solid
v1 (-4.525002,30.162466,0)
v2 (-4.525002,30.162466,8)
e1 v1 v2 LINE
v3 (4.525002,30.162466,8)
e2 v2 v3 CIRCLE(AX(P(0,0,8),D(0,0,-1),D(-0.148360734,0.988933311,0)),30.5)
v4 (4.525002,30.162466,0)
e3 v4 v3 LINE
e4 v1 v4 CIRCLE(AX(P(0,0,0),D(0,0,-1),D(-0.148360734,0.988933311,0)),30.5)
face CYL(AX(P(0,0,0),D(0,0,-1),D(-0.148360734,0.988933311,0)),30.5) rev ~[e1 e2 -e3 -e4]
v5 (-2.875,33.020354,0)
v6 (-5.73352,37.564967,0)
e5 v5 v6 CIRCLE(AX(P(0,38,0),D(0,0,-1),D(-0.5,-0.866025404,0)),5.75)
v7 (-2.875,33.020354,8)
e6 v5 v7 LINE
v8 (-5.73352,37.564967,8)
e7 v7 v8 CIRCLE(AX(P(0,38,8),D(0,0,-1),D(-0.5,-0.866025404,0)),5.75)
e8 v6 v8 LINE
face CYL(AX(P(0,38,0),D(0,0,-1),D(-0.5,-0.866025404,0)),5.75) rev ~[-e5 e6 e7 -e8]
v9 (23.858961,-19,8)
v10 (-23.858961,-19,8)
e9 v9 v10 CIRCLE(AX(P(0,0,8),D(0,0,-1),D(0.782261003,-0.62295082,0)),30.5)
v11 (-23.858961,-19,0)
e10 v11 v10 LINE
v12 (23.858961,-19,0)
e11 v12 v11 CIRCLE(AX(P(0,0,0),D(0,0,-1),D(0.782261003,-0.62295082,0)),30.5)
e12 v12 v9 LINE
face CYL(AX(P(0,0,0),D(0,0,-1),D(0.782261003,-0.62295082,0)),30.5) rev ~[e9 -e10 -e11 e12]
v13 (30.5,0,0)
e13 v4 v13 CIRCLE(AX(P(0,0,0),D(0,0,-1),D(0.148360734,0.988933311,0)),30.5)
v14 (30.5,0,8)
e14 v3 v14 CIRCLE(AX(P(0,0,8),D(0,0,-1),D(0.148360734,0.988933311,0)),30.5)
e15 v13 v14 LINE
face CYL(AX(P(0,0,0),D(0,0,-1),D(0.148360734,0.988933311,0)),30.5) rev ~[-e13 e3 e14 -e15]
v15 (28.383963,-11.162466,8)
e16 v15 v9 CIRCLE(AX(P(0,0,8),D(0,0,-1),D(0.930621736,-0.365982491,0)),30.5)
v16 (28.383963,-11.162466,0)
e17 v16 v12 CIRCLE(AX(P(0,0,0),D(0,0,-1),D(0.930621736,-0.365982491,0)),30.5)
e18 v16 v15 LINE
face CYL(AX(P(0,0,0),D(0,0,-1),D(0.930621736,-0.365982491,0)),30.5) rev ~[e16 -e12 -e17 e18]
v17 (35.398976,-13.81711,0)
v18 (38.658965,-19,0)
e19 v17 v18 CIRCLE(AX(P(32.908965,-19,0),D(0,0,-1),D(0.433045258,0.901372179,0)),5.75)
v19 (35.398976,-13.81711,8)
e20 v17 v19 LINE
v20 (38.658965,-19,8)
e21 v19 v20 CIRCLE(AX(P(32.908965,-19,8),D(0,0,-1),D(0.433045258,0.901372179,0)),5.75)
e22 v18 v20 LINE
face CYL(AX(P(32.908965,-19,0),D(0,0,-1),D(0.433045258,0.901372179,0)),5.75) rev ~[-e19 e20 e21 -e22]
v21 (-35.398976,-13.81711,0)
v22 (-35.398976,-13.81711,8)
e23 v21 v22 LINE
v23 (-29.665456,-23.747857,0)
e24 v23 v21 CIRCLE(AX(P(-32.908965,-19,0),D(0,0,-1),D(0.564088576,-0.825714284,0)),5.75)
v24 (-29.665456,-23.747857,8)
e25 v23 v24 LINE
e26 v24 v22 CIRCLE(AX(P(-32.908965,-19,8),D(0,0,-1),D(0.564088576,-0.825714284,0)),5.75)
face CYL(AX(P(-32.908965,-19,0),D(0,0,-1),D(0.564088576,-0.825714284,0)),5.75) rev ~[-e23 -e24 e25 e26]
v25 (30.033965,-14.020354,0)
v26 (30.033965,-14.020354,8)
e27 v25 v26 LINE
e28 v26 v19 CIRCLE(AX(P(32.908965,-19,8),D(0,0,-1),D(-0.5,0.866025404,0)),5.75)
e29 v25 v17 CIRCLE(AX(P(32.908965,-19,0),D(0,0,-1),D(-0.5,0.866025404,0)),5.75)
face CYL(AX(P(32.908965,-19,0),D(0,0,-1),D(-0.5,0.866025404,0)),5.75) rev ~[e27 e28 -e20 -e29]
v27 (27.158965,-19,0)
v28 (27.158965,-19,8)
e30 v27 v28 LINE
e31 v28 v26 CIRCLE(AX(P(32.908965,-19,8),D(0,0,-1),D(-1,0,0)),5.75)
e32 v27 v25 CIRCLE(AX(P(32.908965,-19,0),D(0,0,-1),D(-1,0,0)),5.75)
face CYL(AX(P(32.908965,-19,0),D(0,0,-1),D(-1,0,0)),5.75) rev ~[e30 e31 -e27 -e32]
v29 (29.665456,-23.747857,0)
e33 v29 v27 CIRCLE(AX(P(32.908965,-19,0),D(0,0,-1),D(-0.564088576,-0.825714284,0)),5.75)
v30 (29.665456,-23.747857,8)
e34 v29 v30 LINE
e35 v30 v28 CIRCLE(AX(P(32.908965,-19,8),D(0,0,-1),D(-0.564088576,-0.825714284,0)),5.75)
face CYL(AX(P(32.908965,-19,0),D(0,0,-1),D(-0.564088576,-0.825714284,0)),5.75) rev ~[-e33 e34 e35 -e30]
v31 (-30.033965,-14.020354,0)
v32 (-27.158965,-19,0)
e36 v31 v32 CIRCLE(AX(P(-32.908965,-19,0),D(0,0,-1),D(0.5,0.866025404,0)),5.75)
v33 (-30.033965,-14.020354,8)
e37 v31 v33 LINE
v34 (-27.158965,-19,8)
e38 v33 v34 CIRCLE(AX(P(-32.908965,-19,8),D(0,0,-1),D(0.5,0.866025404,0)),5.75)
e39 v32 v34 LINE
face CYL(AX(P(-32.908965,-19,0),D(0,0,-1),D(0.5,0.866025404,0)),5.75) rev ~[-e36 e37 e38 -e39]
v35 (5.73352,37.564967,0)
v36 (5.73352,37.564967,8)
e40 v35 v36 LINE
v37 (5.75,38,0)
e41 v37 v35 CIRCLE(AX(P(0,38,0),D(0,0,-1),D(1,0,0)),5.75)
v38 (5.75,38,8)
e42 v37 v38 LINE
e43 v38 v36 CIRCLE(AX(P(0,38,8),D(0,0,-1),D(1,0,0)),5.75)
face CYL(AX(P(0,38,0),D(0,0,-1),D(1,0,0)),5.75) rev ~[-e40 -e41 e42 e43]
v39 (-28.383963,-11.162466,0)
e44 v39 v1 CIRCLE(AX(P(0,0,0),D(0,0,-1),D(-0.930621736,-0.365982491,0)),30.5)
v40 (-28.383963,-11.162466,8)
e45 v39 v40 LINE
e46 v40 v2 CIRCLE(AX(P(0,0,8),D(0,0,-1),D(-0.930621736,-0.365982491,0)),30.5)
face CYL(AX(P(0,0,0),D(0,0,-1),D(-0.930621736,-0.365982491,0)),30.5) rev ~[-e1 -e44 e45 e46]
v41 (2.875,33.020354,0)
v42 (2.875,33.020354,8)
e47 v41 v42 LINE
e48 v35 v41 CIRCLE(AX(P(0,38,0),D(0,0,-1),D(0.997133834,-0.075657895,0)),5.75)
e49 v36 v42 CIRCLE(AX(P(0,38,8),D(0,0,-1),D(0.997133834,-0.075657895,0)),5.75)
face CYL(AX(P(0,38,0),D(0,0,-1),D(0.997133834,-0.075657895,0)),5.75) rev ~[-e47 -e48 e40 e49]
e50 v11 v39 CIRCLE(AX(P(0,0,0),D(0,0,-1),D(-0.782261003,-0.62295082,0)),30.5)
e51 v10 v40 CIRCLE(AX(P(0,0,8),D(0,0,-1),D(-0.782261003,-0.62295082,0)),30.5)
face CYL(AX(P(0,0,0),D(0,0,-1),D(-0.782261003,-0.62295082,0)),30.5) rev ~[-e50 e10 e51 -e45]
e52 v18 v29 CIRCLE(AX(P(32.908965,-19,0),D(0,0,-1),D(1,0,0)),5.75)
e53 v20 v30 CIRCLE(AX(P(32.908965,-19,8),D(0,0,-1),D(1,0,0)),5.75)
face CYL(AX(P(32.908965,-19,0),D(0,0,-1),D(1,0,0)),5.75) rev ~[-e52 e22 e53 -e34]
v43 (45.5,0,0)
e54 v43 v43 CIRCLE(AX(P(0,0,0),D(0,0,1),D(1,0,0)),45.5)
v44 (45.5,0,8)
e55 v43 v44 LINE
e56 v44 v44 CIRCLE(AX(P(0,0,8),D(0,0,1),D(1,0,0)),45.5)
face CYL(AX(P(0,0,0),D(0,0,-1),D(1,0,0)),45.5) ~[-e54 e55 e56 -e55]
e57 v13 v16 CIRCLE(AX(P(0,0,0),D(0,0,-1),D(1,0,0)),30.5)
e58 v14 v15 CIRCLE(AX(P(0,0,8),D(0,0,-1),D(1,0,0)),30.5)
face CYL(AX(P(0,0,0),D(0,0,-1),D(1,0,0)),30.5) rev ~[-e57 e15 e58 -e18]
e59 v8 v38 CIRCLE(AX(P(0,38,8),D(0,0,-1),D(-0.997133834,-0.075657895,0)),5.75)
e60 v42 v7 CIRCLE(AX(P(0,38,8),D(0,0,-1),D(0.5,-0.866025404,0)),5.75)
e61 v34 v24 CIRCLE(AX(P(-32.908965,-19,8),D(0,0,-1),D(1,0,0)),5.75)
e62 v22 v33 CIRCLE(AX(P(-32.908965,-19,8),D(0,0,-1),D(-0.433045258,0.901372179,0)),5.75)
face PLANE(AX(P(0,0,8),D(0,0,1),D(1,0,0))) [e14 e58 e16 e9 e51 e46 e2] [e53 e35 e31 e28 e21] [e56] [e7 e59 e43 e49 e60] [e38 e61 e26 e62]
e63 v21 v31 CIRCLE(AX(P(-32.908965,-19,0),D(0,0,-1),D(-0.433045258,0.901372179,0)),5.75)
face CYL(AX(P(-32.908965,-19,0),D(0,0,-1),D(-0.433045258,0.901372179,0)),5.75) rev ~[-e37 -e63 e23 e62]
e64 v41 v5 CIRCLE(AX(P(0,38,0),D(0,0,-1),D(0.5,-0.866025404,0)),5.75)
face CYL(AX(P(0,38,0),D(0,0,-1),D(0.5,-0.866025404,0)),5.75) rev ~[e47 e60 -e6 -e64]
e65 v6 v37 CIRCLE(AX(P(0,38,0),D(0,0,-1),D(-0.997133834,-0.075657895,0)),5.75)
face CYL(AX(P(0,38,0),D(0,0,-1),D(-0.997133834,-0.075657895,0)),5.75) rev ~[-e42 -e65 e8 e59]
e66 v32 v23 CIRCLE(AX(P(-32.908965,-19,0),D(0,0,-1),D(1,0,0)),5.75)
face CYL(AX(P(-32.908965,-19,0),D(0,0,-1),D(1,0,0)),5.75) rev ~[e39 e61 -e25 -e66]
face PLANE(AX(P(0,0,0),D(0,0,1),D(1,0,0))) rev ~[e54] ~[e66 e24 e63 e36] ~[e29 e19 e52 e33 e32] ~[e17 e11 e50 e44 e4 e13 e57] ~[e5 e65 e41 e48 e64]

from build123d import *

# Parameters (mm, degrees)
F0_R     = 45.5
F1_DEPTH = 8


with BuildPart() as f1:
    # F0 (on Top) → F1 (new body)
    with BuildSketch(Plane.XY):
        Circle(F0_R)
        with BuildLine():
            ThreePointArc((5.7335195457, 37.5649671053), (28.825975636, 24.7601116442), (38, 0))
            ThreePointArc((38, 0), (37.3440830117, -7.0298978664), (35.3989755783, -13.817109973))
            ThreePointArc((35.3989755783, -13.817109973), (37.7762057759, -15.9385509026), (38.6589653438, -19))
            ThreePointArc((38.6589653438, -19), (35.5933946557, -24.0849129068), (29.6654560327, -23.7478571323))
            ThreePointArc((29.6654560327, -23.7478571323), (0, -38), (-29.6654560327, -23.7478571323))
            ThreePointArc((-29.6654560327, -23.7478571323), (-37.8886114156, -21.875), (-35.3989755783, -13.817109973))
            ThreePointArc((-35.3989755783, -13.817109973), (-32.9089653438, 19), (-5.7335195457, 37.5649671053))
            ThreePointArc((-5.7335195457, 37.5649671053), (-0.2176724746, 43.7458784092), (5.75, 38))
            ThreePointArc((5.75, 38), (5.7458784092, 37.7823275254), (5.7335195457, 37.5649671053))
        make_face(mode=Mode.SUBTRACT)
        with BuildLine():
            ThreePointArc((35.3989755783, -13.817109973), (37.3440830117, -7.0298978664), (38, 0))
            ThreePointArc((38, 0), (28.825975636, 24.7601116442), (5.7335195457, 37.5649671053))
            ThreePointArc((5.7335195457, 37.5649671053), (4.8672404321, 34.9385509026), (2.875, 33.0203539282))
            Line((2.875, 33.0203539282), (4.5250023815, 30.1624659709))
            ThreePointArc((4.5250023815, 30.1624659709), (23.1112804993, 19.9027313121), (30.5, 0))
            ThreePointArc((30.5, 0), (29.9663216824, -5.6806306713), (28.3839629623, -11.1624659709))
            Line((28.3839629623, -11.1624659709), (30.0339653438, -14.0203539282))
            ThreePointArc((30.0339653438, -14.0203539282), (32.6912928692, -13.2541215908), (35.3989755783, -13.817109973))
        make_face()
        with BuildLine():
            ThreePointArc((-2.875, 33.0203539282), (-4.8672404321, 34.9385509026), (-5.7335195457, 37.5649671053))
            ThreePointArc((-5.7335195457, 37.5649671053), (-32.9089653438, 19), (-35.3989755783, -13.817109973))
            ThreePointArc((-35.3989755783, -13.817109973), (-32.6912928692, -13.2541215908), (-30.0339653438, -14.0203539282))
            Line((-30.0339653438, -14.0203539282), (-28.3839629623, -11.1624659709))
            ThreePointArc((-28.3839629623, -11.1624659709), (-26.4137748154, 15.25), (-4.5250023815, 30.1624659709))
            Line((-4.5250023815, 30.1624659709), (-2.875, 33.0203539282))
        make_face()
        with BuildLine():
            ThreePointArc((-29.6654560327, -23.7478571323), (0, -38), (29.6654560327, -23.7478571323))
            ThreePointArc((29.6654560327, -23.7478571323), (27.824052437, -21.6844293119), (27.1589653438, -19))
            Line((27.1589653438, -19), (23.8589605809, -19))
            ThreePointArc((23.8589605809, -19), (0, -30.5), (-23.8589605809, -19))
            Line((-23.8589605809, -19), (-27.1589653438, -19))
            ThreePointArc((-27.1589653438, -19), (-27.824052437, -21.6844293119), (-29.6654560327, -23.7478571323))
        make_face()
        with BuildLine():
            Line((4.5250023815, 30.1624659709), (2.875, 33.0203539282))
            ThreePointArc((2.875, 33.0203539282), (0, 32.25), (-2.875, 33.0203539282))
            Line((-2.875, 33.0203539282), (-4.5250023815, 30.1624659709))
            ThreePointArc((-4.5250023815, 30.1624659709), (0, 30.5), (4.5250023815, 30.1624659709))
        make_face()
        with BuildLine():
            ThreePointArc((27.1589653438, -19), (27.929319272, -16.125), (30.0339653438, -14.0203539282))
            Line((30.0339653438, -14.0203539282), (28.3839629623, -11.1624659709))
            ThreePointArc((28.3839629623, -11.1624659709), (26.4137748154, -15.25), (23.8589605809, -19))
            Line((23.8589605809, -19), (27.1589653438, -19))
        make_face()
        with BuildLine():
            Line((-28.3839629623, -11.1624659709), (-30.0339653438, -14.0203539282))
            ThreePointArc((-30.0339653438, -14.0203539282), (-27.929319272, -16.125), (-27.1589653438, -19))
            Line((-27.1589653438, -19), (-23.8589605809, -19))
            ThreePointArc((-23.8589605809, -19), (-26.4137748154, -15.25), (-28.3839629623, -11.1624659709))
        make_face()
    extrude(amount=F1_DEPTH)


solid = f1.part
